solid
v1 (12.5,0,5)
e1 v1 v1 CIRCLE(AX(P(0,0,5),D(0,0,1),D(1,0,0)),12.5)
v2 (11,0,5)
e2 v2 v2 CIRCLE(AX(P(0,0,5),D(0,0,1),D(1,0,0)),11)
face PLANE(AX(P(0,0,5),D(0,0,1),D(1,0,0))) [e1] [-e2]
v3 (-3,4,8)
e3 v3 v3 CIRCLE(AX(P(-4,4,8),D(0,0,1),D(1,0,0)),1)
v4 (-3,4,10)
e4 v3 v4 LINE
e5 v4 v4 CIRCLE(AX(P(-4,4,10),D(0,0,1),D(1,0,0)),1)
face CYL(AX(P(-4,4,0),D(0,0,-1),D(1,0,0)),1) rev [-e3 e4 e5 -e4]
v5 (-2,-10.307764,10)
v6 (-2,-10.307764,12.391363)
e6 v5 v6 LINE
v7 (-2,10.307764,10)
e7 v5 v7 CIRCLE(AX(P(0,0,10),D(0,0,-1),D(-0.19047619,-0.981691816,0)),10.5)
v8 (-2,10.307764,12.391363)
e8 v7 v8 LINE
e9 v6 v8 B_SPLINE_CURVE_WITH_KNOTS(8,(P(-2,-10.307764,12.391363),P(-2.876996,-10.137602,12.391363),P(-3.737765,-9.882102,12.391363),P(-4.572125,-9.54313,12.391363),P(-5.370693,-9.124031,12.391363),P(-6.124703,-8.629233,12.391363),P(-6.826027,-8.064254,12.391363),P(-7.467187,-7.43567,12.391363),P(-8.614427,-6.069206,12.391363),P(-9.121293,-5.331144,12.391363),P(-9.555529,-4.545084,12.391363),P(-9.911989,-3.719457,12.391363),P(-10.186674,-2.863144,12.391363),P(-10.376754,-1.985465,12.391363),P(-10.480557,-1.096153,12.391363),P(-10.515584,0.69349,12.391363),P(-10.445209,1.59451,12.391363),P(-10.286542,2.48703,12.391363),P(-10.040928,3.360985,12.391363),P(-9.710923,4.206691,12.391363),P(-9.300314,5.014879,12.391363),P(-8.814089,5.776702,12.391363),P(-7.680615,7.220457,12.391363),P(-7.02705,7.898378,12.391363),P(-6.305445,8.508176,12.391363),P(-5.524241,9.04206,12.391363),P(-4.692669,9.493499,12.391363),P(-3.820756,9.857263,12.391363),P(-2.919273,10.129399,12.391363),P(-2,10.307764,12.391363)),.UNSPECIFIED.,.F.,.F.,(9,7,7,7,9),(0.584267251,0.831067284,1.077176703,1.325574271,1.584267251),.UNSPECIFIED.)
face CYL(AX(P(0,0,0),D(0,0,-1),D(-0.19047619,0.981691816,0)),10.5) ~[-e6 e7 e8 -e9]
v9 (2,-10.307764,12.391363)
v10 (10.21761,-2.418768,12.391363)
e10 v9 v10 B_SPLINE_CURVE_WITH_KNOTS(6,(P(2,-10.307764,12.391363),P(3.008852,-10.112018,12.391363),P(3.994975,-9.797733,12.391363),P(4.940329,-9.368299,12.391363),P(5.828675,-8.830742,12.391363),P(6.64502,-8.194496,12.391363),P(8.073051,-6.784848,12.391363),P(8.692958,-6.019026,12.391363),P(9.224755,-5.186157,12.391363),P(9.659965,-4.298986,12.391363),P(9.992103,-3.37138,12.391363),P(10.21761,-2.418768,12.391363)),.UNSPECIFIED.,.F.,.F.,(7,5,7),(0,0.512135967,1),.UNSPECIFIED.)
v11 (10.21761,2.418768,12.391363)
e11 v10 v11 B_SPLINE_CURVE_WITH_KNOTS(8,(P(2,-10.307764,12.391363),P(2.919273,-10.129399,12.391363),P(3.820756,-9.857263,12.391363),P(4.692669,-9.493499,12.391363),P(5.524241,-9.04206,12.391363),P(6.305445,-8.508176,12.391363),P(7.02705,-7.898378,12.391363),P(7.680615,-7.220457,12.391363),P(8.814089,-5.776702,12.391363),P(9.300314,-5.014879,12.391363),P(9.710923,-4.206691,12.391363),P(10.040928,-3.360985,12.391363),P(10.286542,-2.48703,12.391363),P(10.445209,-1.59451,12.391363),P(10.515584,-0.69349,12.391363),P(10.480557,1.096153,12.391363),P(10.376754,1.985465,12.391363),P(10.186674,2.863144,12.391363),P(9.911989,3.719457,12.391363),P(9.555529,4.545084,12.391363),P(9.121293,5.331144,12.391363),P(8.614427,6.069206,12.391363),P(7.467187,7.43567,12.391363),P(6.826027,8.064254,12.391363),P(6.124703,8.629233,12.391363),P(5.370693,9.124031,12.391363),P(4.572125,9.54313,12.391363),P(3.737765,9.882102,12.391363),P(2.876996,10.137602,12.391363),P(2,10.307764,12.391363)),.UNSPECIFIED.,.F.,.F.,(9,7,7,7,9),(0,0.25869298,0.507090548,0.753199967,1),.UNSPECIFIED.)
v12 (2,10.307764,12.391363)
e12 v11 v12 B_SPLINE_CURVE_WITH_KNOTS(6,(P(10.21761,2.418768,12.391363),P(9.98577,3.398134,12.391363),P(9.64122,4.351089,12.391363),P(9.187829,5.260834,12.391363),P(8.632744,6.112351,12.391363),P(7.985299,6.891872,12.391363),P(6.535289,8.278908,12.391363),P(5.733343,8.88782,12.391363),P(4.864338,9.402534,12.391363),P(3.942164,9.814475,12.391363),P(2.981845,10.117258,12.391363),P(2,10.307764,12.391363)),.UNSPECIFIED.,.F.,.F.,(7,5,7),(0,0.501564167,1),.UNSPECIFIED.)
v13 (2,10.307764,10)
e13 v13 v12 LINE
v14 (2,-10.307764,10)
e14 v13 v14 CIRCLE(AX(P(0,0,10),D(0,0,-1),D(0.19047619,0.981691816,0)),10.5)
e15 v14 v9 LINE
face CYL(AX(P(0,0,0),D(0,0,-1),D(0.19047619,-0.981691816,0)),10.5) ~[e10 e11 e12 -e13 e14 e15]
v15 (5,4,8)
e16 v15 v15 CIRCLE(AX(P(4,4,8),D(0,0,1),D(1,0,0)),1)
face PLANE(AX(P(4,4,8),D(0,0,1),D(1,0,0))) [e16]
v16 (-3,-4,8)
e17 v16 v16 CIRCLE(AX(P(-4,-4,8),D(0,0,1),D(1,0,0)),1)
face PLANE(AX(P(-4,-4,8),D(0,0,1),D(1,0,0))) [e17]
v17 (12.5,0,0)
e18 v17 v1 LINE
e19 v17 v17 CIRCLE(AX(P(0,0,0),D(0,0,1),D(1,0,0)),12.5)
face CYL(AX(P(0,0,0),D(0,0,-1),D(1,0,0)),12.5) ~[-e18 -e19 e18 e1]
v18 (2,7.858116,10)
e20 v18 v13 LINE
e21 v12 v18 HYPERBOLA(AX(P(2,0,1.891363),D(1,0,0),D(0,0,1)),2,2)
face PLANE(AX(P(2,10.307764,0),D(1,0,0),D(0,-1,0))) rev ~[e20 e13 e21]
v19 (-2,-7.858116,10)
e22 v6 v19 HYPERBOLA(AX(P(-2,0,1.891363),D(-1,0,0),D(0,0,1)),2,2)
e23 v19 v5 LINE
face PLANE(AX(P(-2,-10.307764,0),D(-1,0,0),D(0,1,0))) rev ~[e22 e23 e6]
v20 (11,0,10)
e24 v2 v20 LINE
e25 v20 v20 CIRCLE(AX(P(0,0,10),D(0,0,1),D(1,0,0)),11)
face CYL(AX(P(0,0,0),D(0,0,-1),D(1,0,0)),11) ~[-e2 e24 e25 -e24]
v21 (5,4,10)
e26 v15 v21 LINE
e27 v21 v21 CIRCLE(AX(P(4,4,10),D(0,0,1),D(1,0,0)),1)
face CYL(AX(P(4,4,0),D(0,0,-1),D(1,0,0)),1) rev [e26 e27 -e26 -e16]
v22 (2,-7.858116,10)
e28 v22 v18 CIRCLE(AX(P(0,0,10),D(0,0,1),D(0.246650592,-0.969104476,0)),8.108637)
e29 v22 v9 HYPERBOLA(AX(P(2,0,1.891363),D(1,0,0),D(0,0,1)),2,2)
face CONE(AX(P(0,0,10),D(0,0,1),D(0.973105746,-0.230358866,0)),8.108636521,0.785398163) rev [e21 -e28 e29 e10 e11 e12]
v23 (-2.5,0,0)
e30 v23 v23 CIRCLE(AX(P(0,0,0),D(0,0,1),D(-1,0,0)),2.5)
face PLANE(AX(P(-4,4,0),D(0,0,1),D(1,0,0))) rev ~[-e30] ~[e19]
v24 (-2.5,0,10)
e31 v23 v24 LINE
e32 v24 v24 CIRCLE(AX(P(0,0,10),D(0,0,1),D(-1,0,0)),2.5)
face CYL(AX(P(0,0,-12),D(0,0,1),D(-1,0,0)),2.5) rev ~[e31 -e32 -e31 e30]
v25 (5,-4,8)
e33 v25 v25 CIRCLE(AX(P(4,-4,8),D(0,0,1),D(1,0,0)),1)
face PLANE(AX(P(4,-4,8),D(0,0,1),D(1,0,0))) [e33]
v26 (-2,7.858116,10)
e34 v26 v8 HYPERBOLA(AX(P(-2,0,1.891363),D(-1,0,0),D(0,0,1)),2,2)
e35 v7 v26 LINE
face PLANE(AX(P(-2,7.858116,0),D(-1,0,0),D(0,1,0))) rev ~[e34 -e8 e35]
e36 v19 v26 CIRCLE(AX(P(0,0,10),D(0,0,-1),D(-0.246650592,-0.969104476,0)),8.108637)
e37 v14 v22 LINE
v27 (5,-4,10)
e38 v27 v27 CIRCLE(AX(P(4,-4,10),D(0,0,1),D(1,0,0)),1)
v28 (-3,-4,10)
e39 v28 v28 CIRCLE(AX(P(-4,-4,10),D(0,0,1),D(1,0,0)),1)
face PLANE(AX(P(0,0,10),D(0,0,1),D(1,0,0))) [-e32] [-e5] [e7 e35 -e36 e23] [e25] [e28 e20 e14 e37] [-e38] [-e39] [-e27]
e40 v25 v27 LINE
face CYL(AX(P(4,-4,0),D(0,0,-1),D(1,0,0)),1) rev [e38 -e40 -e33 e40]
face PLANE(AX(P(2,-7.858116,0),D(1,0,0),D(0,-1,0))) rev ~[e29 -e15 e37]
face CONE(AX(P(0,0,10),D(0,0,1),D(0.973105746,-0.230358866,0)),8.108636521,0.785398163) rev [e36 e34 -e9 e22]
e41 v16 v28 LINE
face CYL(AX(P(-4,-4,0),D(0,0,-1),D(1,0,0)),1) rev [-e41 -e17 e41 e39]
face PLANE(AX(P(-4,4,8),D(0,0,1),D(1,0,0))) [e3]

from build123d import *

# Parameters (mm, degrees)
F0_R        = 12.5
F0_R_2      = 11
F1_DEPTH    = 5
F0_R_3      = 1
F2_DEPTH    = 10
F3_DEPTH    = 15
F4_T4_ANGLE = 333.3635987438
F4_T9_ANGLE = 333.3635987438
F5_D        = 5
F5_DEPTH    = 12
F5_TIP      = 1.5021515476
F6_DEPTH    = 8


# Not quite as in the source:
# - a fillet or chamfer that OpenCascade refuses, or shapes differently, is made with other operations: its cross-section is extruded or revolved along the edge and cut away or added


with BuildPart() as f1:
    # F0 (on Top) → F1 (new body)
    with BuildSketch(Plane.XY):
        Circle(F0_R)
        Circle(F0_R_2, mode=Mode.SUBTRACT)
    extrude(amount=F1_DEPTH)

    # F0 (on Top) → F2 (join)
    with BuildSketch(Plane.XY):
        Circle(F0_R_2)
        with Locations((-4, -4)):
            Circle(F0_R_3, mode=Mode.SUBTRACT)
        with Locations((4, -4)):
            Circle(F0_R_3, mode=Mode.SUBTRACT)
        with BuildLine():
            ThreePointArc((-2, -10.307764064), (-10.5, 0), (-2, 10.307764064))
            Line((-2, 10.307764064), (-2, 7.8581159461))
            ThreePointArc((-2, 7.8581159461), (-8.1086365206, 0), (-2, -7.8581159461))
            Line((-2, -7.8581159461), (-2, -10.307764064))
        make_face(mode=Mode.SUBTRACT)
        with Locations((-4, 4)):
            Circle(F0_R_3, mode=Mode.SUBTRACT)
        with Locations((4, 4)):
            Circle(F0_R_3, mode=Mode.SUBTRACT)
        with BuildLine():
            ThreePointArc((2, 10.307764064), (10.5, 0), (2, -10.307764064))
            Line((2, -10.307764064), (2, -7.8581159461))
            ThreePointArc((2, -7.8581159461), (8.1086365206, 0), (2, 7.8581159461))
            Line((2, 7.8581159461), (2, 10.307764064))
        make_face(mode=Mode.SUBTRACT)
    extrude(amount=F2_DEPTH)

    # F0 (on Top) → F3 (join)
    with BuildSketch(Plane.XY):
        with BuildLine():
            Line((-2, 7.8581159461), (-2, 10.307764064))
            ThreePointArc((-2, 10.307764064), (-10.5, 0), (-2, -10.307764064))
            Line((-2, -10.307764064), (-2, -7.8581159461))
            ThreePointArc((-2, -7.8581159461), (-8.1086365206, 0), (-2, 7.8581159461))
        make_face()
        with BuildLine():
            Line((2, -7.8581159461), (2, -10.307764064))
            ThreePointArc((2, -10.307764064), (10.5, 0), (2, 10.307764064))
            Line((2, 10.307764064), (2, 7.8581159461))
            ThreePointArc((2, 7.8581159461), (8.1086365206, 0), (2, -7.8581159461))
        make_face()
    extrude(amount=F3_DEPTH)

    # F4: chamfer of 5 on 2 edges, made by hand


with BuildPart() as f4_tool2:
    # F4_s3 → F4_t4 (revolve)
    with BuildSketch(Plane(origin=(0, 0, 0), x_dir=(0, 0, 1), z_dir=(0.2303588664, 0.9731057459, 0))):
        Polygon((10, 8.1086365206), (15, 13.1086365206), (15, 8.1086365206), align=None)
    revolve(axis=Axis((0, 0, 15), (0, 0, -1)), revolution_arc=F4_T4_ANGLE)

    split(bisect_by=Plane.XY.offset(10), keep=Keep.TOP)


with BuildPart() as f1_1:
    add(f1.part)

    # F4_t1: cut F4_tool2
    add(f4_tool2.part, mode=Mode.SUBTRACT)


with BuildPart() as f4_tool7:
    # F4_s8 → F4_t9 (revolve)
    with BuildSketch(Plane(origin=(0, 0, 0), x_dir=(0, 0, 1), z_dir=(-0.2303588664, -0.9731057459, 0))):
        Polygon((10, 8.1086365206), (15, 13.1086365206), (15, 8.1086365206), align=None)
    revolve(axis=Axis((0, 0, 15), (0, 0, -1)), revolution_arc=F4_T9_ANGLE)

    split(bisect_by=Plane.XY.offset(10), keep=Keep.TOP)


with BuildPart() as f1_2:
    add(f1_1.part)

    # F4_t6: cut F4_tool7
    add(f4_tool7.part, mode=Mode.SUBTRACT)

    # F5
    with Locations(Plane(origin=(0, 0, 0), x_dir=(1, 0, 0), z_dir=(0, 0, -1))):
        with Locations((0, 0)):
            Hole(F5_D / 2, depth=F5_DEPTH)
            with Locations((0, 0, -(F5_DEPTH + F5_TIP / 2))):  # 118° drill point
                Cone(0, F5_D / 2, F5_TIP, mode=Mode.SUBTRACT)

    # F0 (on Top) → F6 (join)
    with BuildSketch(Plane.XY):
        with Locations((-4, 4)):
            Circle(F0_R_3)
        with Locations((4, 4)):
            Circle(F0_R_3)
        with Locations((-4, -4)):
            Circle(F0_R_3)
        with Locations((4, -4)):
            Circle(F0_R_3)
    extrude(amount=F6_DEPTH)


solid = f1_2.part
